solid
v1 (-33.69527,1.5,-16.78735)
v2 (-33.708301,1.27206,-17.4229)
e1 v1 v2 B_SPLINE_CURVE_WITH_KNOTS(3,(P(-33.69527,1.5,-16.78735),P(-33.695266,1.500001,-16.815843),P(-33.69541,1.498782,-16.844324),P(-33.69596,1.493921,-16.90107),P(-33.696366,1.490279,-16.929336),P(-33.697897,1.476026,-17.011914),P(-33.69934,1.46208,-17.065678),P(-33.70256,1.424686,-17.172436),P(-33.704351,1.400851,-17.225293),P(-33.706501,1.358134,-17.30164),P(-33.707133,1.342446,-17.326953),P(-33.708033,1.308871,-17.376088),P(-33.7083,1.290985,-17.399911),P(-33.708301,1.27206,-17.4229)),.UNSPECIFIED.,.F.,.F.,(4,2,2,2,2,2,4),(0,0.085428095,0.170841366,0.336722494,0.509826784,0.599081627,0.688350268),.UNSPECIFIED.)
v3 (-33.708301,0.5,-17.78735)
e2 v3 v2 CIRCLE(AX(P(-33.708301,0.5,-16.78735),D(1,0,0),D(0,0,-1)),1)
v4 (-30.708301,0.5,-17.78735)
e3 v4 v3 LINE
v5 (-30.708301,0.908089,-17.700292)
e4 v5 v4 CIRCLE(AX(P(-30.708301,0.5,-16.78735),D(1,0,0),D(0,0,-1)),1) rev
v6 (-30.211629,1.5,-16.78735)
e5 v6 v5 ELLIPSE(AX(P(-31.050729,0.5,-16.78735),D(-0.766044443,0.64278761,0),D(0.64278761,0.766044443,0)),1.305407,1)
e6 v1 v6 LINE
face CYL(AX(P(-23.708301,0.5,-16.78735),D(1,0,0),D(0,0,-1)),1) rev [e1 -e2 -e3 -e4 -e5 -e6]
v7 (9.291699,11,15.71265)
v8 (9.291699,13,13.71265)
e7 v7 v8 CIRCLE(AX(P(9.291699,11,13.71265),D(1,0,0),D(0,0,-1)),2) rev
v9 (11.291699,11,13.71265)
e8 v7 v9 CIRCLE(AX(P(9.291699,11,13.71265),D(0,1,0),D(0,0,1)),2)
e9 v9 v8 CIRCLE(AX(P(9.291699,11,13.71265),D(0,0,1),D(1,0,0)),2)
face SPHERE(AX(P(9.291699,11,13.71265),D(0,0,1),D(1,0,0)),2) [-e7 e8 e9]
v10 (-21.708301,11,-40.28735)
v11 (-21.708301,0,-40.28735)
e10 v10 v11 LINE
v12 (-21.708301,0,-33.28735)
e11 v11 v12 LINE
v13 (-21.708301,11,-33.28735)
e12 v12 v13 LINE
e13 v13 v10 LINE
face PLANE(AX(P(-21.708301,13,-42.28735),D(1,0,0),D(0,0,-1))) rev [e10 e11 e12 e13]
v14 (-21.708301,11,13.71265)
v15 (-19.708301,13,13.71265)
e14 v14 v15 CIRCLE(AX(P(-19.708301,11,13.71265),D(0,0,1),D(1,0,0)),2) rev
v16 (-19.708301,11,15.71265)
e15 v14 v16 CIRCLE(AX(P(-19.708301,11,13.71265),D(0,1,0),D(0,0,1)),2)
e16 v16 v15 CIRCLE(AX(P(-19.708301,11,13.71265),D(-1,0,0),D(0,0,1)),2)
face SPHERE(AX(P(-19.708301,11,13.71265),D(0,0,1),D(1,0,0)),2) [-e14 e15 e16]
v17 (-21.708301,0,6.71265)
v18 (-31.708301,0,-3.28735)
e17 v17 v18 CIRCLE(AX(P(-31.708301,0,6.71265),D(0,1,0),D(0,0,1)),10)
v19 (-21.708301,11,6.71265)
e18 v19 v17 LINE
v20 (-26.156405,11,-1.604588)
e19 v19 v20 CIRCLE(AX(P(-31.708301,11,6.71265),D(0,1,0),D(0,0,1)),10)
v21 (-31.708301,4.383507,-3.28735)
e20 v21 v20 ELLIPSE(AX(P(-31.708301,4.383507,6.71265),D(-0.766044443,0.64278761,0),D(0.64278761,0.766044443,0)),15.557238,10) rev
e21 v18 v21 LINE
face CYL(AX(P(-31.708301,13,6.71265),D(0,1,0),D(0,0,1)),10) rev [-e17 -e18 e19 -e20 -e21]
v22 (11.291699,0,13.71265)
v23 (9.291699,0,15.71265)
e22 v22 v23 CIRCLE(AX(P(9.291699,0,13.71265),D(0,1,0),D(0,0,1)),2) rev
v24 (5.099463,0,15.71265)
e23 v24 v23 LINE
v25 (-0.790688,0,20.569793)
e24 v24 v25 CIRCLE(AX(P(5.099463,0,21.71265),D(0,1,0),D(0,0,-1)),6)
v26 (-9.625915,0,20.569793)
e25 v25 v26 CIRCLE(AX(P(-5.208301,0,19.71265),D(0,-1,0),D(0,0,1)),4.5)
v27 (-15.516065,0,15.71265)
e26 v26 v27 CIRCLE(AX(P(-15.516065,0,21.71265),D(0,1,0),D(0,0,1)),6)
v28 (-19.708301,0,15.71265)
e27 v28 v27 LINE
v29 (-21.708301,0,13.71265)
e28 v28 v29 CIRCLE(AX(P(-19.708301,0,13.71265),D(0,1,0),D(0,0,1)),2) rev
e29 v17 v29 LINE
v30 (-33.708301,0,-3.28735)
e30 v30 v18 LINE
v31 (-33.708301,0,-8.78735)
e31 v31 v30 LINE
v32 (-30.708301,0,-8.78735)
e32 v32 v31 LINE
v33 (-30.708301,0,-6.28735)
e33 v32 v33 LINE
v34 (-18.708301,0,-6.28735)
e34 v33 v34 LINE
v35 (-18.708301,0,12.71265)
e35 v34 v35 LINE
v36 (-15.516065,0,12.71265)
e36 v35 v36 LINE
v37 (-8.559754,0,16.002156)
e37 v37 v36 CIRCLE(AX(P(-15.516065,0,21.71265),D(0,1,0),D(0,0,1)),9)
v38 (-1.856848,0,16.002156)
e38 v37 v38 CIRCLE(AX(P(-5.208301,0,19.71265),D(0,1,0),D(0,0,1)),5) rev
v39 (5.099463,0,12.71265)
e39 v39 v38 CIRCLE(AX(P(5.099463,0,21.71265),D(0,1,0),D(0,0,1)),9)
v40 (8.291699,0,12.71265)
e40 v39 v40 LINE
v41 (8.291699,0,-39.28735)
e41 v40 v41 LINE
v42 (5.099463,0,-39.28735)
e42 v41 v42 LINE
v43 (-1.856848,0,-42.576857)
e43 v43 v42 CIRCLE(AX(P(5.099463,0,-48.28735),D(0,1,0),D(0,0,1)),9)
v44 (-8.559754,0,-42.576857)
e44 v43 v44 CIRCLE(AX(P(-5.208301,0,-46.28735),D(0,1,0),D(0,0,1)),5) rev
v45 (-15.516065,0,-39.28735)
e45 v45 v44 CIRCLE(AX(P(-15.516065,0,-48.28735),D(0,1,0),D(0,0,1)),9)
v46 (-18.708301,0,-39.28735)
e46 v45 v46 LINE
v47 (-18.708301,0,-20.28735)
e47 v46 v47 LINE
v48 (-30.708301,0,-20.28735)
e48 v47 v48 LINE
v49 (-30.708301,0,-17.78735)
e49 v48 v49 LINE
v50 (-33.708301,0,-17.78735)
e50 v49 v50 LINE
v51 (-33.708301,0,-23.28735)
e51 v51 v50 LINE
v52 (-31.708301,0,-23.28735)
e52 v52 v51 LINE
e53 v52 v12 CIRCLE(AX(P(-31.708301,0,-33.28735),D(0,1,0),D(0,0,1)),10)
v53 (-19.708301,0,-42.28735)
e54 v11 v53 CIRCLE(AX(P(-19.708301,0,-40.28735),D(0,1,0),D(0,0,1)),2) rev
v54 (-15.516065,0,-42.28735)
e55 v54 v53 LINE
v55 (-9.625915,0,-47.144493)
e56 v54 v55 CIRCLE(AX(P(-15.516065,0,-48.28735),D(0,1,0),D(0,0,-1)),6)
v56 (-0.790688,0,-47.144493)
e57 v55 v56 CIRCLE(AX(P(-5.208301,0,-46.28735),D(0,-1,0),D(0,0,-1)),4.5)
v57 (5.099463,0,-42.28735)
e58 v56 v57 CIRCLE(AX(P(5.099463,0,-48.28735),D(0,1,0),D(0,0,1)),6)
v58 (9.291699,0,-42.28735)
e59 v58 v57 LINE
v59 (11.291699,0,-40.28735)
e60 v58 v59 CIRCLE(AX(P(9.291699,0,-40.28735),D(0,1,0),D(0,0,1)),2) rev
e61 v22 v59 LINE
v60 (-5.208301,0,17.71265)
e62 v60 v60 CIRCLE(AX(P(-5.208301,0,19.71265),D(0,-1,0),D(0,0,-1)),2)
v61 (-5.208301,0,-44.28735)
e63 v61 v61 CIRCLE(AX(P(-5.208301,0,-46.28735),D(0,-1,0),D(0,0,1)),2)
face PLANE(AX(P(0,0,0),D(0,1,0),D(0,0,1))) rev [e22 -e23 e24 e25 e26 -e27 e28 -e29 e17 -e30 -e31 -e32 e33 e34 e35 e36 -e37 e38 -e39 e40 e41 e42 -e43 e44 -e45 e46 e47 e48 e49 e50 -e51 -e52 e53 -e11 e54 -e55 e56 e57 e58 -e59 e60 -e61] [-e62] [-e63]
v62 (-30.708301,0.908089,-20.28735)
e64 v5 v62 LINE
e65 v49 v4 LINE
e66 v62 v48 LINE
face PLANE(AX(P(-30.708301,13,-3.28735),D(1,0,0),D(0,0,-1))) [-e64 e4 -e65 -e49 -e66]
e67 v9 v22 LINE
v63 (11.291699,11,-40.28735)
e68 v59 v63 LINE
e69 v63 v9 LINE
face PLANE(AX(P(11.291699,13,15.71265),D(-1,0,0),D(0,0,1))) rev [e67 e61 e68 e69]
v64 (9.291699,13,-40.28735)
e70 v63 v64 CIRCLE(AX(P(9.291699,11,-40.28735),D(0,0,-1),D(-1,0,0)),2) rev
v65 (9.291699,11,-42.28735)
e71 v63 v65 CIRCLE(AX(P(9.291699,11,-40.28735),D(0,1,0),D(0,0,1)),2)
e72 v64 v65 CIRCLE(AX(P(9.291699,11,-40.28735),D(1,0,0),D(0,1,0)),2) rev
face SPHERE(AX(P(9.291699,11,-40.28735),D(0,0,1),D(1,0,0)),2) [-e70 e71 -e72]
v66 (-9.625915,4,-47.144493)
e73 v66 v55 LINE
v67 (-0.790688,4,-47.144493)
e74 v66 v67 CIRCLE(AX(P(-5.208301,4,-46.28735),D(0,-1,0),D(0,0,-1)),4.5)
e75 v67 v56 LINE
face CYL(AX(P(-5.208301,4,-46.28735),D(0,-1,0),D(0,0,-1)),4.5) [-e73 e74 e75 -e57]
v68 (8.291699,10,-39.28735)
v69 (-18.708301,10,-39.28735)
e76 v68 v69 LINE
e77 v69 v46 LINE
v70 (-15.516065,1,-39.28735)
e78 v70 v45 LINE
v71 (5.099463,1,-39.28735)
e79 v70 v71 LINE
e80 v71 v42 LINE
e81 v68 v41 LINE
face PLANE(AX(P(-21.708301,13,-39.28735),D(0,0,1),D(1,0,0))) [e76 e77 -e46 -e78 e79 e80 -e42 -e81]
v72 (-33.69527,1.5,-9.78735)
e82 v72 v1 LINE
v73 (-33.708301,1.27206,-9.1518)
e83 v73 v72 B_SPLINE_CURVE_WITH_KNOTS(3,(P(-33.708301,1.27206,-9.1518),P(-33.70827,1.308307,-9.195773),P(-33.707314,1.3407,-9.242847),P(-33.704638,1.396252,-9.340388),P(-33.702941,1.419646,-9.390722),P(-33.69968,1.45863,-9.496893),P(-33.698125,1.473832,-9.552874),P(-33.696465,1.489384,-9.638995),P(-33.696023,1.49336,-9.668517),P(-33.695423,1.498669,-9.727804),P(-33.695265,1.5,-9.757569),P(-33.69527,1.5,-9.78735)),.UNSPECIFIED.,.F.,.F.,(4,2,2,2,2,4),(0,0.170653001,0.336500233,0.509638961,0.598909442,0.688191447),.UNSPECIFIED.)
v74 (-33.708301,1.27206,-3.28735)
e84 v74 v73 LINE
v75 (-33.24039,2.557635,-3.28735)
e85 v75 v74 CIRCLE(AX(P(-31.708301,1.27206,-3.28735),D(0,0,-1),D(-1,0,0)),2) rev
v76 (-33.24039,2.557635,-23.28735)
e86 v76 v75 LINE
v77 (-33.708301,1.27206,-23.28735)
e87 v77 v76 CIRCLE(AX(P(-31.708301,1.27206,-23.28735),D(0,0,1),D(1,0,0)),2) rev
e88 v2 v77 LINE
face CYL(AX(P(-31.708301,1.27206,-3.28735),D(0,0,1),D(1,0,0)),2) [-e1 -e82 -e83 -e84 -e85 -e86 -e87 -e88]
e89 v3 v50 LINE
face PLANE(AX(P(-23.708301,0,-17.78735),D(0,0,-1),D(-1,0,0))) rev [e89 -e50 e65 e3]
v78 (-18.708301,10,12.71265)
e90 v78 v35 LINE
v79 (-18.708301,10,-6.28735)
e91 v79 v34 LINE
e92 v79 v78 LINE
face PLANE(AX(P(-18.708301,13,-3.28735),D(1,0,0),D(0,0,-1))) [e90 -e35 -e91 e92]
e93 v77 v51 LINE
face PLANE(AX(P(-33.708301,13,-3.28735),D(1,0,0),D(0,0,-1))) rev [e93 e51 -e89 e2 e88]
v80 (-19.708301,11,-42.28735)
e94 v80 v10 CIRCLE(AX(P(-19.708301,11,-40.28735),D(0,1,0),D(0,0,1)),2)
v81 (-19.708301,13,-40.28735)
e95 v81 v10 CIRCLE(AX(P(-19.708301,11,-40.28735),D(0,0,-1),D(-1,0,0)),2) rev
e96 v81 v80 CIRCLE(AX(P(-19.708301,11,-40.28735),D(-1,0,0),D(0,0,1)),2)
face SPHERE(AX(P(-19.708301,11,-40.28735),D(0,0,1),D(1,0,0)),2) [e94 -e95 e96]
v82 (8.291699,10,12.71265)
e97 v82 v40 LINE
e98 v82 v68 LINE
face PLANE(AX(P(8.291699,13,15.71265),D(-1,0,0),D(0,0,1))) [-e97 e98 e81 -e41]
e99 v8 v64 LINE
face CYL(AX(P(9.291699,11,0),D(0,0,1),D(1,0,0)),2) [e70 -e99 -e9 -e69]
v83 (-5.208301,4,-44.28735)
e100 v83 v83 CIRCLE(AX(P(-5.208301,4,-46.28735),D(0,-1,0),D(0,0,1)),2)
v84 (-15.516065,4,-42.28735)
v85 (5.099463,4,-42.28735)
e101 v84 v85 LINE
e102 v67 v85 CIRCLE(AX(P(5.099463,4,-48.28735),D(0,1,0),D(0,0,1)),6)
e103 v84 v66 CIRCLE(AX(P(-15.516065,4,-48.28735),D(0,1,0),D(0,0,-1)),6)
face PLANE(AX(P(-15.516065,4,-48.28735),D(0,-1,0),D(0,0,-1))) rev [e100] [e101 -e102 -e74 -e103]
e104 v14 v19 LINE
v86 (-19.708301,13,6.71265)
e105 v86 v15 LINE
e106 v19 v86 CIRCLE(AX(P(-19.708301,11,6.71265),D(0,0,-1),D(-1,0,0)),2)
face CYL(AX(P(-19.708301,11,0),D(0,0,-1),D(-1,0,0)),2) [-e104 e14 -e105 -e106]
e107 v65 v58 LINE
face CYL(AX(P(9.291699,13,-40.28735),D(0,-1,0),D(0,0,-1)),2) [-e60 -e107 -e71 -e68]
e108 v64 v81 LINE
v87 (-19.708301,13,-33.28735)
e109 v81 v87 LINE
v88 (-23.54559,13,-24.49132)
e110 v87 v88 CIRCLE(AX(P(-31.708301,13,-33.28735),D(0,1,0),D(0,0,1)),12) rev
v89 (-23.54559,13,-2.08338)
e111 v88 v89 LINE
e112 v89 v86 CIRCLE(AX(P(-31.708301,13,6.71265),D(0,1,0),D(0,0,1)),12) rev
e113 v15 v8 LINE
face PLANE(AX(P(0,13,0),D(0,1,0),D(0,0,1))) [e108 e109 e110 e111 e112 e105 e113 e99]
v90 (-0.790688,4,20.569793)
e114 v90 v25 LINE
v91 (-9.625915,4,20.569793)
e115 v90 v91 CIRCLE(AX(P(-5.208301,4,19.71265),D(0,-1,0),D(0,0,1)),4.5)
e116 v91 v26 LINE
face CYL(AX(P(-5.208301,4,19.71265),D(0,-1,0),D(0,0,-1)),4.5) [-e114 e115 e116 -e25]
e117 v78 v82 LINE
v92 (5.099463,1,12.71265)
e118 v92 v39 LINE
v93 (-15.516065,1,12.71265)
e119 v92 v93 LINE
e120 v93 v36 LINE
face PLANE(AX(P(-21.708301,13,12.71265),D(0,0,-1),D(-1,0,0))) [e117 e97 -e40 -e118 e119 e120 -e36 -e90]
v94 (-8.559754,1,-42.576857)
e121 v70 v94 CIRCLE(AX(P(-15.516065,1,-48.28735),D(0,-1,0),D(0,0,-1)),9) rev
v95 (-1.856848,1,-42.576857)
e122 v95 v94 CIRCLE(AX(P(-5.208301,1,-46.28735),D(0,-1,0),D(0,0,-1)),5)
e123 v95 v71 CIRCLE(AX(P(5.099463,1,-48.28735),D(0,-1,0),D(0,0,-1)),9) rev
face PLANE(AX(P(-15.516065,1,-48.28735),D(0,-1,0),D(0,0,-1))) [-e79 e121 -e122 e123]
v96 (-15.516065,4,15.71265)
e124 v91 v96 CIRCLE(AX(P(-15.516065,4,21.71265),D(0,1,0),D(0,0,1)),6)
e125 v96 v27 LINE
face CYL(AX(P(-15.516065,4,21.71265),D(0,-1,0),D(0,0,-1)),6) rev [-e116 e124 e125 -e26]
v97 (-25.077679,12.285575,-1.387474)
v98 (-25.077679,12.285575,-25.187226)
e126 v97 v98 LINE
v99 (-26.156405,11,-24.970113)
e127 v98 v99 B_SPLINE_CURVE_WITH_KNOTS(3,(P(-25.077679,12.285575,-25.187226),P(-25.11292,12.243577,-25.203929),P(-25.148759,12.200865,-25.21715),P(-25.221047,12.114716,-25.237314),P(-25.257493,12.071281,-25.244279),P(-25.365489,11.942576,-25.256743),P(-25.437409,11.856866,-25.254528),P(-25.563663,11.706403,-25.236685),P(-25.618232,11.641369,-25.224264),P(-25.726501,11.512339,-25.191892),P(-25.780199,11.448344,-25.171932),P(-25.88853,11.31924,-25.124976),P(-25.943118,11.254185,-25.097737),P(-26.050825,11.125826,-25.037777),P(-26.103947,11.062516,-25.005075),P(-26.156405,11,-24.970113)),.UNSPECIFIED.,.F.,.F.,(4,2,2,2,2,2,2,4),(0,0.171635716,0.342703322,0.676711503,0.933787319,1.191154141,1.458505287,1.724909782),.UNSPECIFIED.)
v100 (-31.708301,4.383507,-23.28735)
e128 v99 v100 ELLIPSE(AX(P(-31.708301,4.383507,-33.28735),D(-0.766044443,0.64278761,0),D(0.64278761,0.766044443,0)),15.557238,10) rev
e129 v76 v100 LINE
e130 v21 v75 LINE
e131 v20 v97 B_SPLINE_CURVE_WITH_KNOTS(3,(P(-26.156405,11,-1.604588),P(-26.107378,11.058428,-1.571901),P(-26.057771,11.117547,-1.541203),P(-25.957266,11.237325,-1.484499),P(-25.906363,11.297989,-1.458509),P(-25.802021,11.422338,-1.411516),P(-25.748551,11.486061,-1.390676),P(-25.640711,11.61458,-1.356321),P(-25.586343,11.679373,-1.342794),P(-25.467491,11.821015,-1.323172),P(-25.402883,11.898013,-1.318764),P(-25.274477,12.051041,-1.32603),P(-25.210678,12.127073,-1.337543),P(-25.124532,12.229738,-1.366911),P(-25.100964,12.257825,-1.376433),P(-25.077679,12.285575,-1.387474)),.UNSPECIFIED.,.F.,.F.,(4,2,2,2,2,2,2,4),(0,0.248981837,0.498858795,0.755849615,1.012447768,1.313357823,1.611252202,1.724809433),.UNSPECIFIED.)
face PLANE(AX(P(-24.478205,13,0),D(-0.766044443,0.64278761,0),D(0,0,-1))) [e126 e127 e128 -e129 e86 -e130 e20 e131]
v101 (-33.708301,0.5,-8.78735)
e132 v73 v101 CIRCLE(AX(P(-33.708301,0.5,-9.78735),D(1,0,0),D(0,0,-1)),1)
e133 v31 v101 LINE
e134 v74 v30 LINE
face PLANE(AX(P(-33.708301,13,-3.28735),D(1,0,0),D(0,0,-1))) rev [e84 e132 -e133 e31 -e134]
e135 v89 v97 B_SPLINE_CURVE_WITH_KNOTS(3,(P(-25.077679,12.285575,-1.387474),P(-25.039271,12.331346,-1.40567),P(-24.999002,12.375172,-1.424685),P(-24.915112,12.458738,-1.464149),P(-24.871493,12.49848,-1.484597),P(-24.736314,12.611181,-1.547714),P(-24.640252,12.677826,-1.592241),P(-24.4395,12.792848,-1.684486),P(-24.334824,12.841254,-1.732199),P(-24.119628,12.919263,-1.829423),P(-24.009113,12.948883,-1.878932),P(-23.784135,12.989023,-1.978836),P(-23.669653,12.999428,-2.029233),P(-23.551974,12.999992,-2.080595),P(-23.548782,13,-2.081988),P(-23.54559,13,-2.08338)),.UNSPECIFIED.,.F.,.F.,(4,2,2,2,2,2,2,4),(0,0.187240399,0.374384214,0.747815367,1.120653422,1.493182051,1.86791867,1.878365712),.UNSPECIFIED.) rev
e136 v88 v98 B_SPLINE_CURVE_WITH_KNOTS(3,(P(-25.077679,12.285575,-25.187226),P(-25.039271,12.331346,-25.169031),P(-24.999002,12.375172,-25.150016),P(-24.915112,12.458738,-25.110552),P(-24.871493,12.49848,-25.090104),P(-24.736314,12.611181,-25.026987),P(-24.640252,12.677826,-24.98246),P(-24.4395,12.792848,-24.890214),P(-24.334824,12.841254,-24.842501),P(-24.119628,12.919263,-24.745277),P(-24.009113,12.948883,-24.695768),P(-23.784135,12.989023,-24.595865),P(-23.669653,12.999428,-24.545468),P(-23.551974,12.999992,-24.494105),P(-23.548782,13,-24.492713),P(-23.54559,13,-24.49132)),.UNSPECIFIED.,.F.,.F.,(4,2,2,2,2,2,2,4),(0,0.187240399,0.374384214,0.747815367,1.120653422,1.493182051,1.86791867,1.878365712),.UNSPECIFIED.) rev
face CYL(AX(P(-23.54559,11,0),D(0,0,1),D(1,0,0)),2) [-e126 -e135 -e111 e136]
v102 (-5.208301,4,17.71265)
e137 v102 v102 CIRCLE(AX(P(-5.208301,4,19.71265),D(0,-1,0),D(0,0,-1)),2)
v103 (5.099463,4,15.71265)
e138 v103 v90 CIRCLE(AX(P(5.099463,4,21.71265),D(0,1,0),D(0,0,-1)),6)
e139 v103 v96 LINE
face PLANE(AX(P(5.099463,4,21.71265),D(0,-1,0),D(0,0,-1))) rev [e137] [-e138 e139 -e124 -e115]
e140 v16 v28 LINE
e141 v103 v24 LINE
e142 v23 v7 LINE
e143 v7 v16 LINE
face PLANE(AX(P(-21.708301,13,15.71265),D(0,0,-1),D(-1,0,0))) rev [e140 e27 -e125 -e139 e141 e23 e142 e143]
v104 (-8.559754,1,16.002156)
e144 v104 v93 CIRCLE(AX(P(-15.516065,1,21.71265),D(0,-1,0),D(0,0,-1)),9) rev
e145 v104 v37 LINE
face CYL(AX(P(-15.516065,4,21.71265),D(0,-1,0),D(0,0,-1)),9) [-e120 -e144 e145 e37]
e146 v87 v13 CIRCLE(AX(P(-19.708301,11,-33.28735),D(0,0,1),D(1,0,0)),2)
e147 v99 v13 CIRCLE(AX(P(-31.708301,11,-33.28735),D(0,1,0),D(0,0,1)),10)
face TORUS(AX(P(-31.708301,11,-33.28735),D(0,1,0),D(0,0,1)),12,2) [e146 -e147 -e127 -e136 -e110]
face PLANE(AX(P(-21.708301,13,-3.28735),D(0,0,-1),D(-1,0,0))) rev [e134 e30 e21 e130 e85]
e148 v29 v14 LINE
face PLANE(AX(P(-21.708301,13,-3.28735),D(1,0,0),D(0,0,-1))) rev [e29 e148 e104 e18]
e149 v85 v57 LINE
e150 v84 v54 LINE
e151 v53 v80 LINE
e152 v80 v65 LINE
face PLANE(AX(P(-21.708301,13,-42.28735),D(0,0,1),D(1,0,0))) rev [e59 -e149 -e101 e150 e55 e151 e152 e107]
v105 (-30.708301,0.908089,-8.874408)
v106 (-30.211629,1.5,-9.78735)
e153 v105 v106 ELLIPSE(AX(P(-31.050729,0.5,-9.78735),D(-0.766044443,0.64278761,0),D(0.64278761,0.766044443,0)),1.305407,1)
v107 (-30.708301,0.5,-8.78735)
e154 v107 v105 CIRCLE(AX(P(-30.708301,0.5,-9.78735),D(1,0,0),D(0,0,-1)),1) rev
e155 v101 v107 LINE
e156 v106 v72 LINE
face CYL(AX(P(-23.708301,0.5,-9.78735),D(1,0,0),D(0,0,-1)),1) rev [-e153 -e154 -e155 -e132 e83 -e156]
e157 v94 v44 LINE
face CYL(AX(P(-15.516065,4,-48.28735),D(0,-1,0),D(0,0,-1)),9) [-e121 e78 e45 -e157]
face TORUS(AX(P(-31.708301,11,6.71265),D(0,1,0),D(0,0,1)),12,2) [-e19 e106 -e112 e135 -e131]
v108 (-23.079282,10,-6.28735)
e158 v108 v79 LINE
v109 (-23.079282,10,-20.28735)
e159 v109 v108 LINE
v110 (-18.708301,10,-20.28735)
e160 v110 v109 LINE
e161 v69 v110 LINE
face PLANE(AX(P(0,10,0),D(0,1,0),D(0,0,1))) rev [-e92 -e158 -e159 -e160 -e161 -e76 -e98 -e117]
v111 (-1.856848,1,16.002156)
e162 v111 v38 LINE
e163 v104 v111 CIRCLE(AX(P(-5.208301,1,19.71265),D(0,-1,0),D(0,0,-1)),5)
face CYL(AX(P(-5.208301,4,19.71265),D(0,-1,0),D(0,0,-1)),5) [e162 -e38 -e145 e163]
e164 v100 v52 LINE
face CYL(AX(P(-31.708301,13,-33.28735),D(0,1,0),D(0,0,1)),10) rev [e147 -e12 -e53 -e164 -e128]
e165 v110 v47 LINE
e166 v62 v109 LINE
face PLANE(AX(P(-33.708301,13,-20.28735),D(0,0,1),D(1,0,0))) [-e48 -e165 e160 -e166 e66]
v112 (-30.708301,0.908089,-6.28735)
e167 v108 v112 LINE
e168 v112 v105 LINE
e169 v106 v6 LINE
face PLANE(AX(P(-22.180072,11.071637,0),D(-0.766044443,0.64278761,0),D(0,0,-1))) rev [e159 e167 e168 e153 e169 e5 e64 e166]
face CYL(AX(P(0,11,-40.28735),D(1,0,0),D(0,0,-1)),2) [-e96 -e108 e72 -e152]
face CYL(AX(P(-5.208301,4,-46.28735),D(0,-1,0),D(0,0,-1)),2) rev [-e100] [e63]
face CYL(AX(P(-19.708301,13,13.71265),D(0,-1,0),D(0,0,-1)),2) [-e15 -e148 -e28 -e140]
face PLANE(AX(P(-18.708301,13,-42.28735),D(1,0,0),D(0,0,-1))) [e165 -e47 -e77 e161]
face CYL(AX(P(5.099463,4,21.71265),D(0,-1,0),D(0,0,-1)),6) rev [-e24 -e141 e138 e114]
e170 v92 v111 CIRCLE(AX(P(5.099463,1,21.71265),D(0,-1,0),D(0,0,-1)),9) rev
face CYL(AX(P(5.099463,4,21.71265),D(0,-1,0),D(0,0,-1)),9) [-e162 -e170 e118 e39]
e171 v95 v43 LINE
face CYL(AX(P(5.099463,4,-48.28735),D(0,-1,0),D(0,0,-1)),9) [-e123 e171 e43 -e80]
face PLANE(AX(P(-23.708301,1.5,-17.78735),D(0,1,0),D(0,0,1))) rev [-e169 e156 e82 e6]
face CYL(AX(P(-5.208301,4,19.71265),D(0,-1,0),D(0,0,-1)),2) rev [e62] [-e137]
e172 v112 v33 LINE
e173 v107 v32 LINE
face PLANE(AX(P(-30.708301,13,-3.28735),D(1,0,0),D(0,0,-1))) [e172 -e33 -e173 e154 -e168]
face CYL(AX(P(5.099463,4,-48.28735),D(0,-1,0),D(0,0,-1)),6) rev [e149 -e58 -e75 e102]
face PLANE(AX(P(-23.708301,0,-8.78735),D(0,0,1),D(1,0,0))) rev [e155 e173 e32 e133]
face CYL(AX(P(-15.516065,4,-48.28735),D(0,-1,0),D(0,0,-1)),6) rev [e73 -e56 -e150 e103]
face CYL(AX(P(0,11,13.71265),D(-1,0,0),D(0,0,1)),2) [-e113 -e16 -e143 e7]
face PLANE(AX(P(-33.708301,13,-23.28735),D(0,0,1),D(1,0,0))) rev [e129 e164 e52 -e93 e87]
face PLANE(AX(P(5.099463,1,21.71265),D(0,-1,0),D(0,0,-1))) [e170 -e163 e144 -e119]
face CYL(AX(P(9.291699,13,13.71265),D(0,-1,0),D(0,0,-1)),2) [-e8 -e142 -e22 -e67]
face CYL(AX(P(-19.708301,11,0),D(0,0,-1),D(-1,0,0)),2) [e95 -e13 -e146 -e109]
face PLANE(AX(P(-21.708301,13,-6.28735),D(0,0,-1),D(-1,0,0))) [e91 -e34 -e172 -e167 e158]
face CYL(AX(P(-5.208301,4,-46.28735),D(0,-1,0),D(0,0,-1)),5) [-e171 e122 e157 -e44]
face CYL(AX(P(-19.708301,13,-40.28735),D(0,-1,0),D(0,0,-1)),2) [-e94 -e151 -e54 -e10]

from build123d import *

# Parameters (mm, degrees)
BOSS_EXTRU_1_DEPTH      = 13
ESQUISSE2_R             = 2
BOSS_EXTRU_2_DEPTH      = 4
CHANFREIN2_SIZE         = 11
CHANFREIN2_SIZE2        = 9.230095943
COQUE1_DEPTH            = 0.908089297
COQUE1_2_DEPTH          = 1
COQUE1_START            = -39.287350261
COQUE1_3_OUTLINE_W      = 27
COQUE1_3_OUTLINE_H      = 9.091910703
COQUE1_3_DEPTH          = 52
COQUE1_START_2          = -20.287350261
COQUE1_4_DEPTH          = 14
CONG_4_R                = 10
ESQUISSE3_W             = 9
ESQUISSE3_H             = 1.5
ENL_V_MAT_EXTRU_1_DEPTH = 10
CONG_2_R                = 1
CONG_3_R                = 2


with BuildPart() as part:
    # Esquisse1 → Boss.-Extru.1 (new body)
    with BuildSketch(Plane(origin=(0, 0, 0), x_dir=(1, 0, 0), z_dir=(0, 1, 0))):
        Polygon((-21.708301388, 3.287350261), (-33.708301388, 3.287350261), (-33.708301388, 23.287350261), (-21.708301388, 23.287350261), (-21.708301388, 42.287350261), (11.291698612, 42.287350261), (11.291698612, -15.712649739), (-21.708301388, -15.712649739), align=None)
    extrude(amount=BOSS_EXTRU_1_DEPTH)

    # Esquisse2 → Boss.-Extru.2 (add)
    # profile 1 of 2: a face of its own
    with BuildSketch(Plane.XZ):
        with BuildLine():
            Line((-17.708301388, 12.712649739), (7.291698612, 12.712649739))
            Line((7.291698612, 12.712649739), (7.291698612, 15.712649739))
            Line((7.291698612, 15.712649739), (5.099462676, 15.712649739))
            ThreePointArc((5.099462676, 15.712649739), (1.282208614, 17.08354924), (-0.790688218, 20.569792596))
            ThreePointArc((-0.790688218, 20.569792596), (-5.208301388, 24.212649739), (-9.625914558, 20.569792596))
            ThreePointArc((-9.625914558, 20.569792596), (-11.698811391, 17.08354924), (-15.516065452, 15.712649739))
            Line((-15.516065452, 15.712649739), (-17.708301388, 15.712649739))
            Line((-17.708301388, 15.712649739), (-17.708301388, 12.712649739))
        make_face()
        with Locations(Location((-5.208301388, 19.712649739, 0), (0, 0, 270))):
            Circle(ESQUISSE2_R, mode=Mode.SUBTRACT)
    # profile 2 of 2: a face of its own
    with BuildSketch(Plane.XZ):
        with BuildLine():
            Line((-17.708301388, -42.287350261), (-17.708301388, -39.287350261))
            Line((-17.708301388, -39.287350261), (7.291698612, -39.287350261))
            Line((7.291698612, -39.287350261), (7.291698612, -42.287350261))
            Line((7.291698612, -42.287350261), (5.099462676, -42.287350261))
            ThreePointArc((5.099462676, -42.287350261), (1.282208614, -43.658249762), (-0.790688218, -47.144493118))
            ThreePointArc((-0.790688218, -47.144493118), (-5.208301388, -50.787350261), (-9.625914558, -47.144493118))
            ThreePointArc((-9.625914558, -47.144493118), (-11.698811391, -43.658249762), (-15.516065452, -42.287350261))
            Line((-15.516065452, -42.287350261), (-17.708301388, -42.287350261))
        make_face()
        with Locations(Location((-5.208301388, -46.287350261, 0), (0, 0, 90))):
            Circle(ESQUISSE2_R, mode=Mode.SUBTRACT)
    extrude(amount=-BOSS_EXTRU_2_DEPTH)

    # Chanfrein2
    chanfrein2_edges = [part.edges().sort_by_distance(p)[0] for p in [
        (-33.708301388, 13, -13.287350261),
    ]]
    chanfrein2_side = [part.faces().sort_by_distance(p)[0] for p in [
        (-33.708301388, 6.5, -13.287350261),
    ]]
    chamfer(chanfrein2_edges, length=CHANFREIN2_SIZE, length2=CHANFREIN2_SIZE2, reference=chanfrein2_side[0])

    # Coque1: read off the stored shape, not the designer's step
    # Coque1 outline → Coque1 (cut)
    with BuildSketch(Plane(origin=(0, 0, 0), x_dir=(1, 0, 0), z_dir=(0, 1, 0))):
        with BuildLine():
            Line((-18.708301388, 6.287350261), (-18.708301388, -12.712649739))
            Line((-18.708301388, -12.712649739), (-15.516065452, -12.712649739))
            ThreePointArc((-15.516065452, -12.712649739), (-11.668627484, -13.57648227), (-8.559754422, -16.002156165))
            ThreePointArc((-8.559754422, -16.002156165), (-5.208301388, -14.712649739), (-1.856848354, -16.002156165))
            ThreePointArc((-1.856848354, -16.002156165), (1.252024708, -13.57648227), (5.099462676, -12.712649739))
            Line((5.099462676, -12.712649739), (8.291698612, -12.712649739))
            Line((8.291698612, -12.712649739), (8.291698612, 39.287350261))
            Line((8.291698612, 39.287350261), (5.099462676, 39.287350261))
            ThreePointArc((5.099462676, 39.287350261), (1.252024708, 40.151182792), (-1.856848354, 42.576856687))
            ThreePointArc((-1.856848354, 42.576856687), (-5.208301388, 41.287350261), (-8.559754422, 42.576856687))
            ThreePointArc((-8.559754422, 42.576856687), (-11.668627484, 40.151182792), (-15.516065452, 39.287350261))
            Line((-15.516065452, 39.287350261), (-18.708301388, 39.287350261))
            Line((-18.708301388, 39.287350261), (-18.708301388, 20.287350261))
            Line((-18.708301388, 20.287350261), (-30.708301388, 20.287350261))
            Line((-30.708301388, 20.287350261), (-30.708301388, 6.287350261))
            Line((-30.708301388, 6.287350261), (-18.708301388, 6.287350261))
        make_face()
    extrude(amount=COQUE1_DEPTH, mode=Mode.SUBTRACT)

    # Coque1 2 outline → Coque1 2 (cut)
    with BuildSketch(Plane(origin=(0, 0, 0), x_dir=(1, 0, 0), z_dir=(0, 1, 0))):
        with BuildLine():
            Line((5.099462676, -12.712649739), (-15.516065452, -12.712649739))
            ThreePointArc((-15.516065452, -12.712649739), (-11.668627484, -13.57648227), (-8.559754422, -16.002156165))
            ThreePointArc((-8.559754422, -16.002156165), (-5.208301388, -14.712649739), (-1.856848354, -16.002156165))
            ThreePointArc((-1.856848354, -16.002156165), (1.252024708, -13.57648227), (5.099462676, -12.712649739))
        make_face()
        with BuildLine():
            Line((-15.516065452, 39.287350261), (5.099462676, 39.287350261))
            ThreePointArc((5.099462676, 39.287350261), (1.252024708, 40.151182792), (-1.856848354, 42.576856687))
            ThreePointArc((-1.856848354, 42.576856687), (-5.208301388, 41.287350261), (-8.559754422, 42.576856687))
            ThreePointArc((-8.559754422, 42.576856687), (-11.668627484, 40.151182792), (-15.516065452, 39.287350261))
        make_face()
    extrude(amount=COQUE1_2_DEPTH, mode=Mode.SUBTRACT)

    # Coque1 3 outline → Coque1 3 (cut)
    with BuildSketch(Plane.XY.offset(COQUE1_START)):
        with Locations((-5.208301388, 5.454044649)):
            Rectangle(COQUE1_3_OUTLINE_W, COQUE1_3_OUTLINE_H)
    extrude(amount=COQUE1_3_DEPTH, mode=Mode.SUBTRACT)

    # Coque1 4 outline → Coque1 4 (cut)
    with BuildSketch(Plane.XY.offset(COQUE1_START_2)):
        Polygon((-30.708301388, 0.908089297), (-18.708301388, 0.908089297), (-18.708301388, 10), (-23.079282471, 10), align=None)
    extrude(amount=COQUE1_4_DEPTH, mode=Mode.SUBTRACT)

    # Congé4
    # the kernel refuses this fillet: 10 mm, written as the material it adds along each edge
    with BuildSketch(Plane(origin=(-21.708301388, 0, -3.287350261), x_dir=(-1, 0, 0), z_dir=(0, 1, 0))) as cong_4_piece_1_section:
        with BuildLine():
            CenterArc((CONG_4_R, CONG_4_R), CONG_4_R, 180, 90)
            Line((0, CONG_4_R), (0, 0))
            Line((0, 0), (CONG_4_R, 0))
        make_face()
    cong_4_piece_1 = extrude(amount=13, mode=Mode.PRIVATE)
    cong_4_piece_1 = split(cong_4_piece_1, bisect_by=Plane(origin=(-29.734998207, 6.73519834, -3.287350261), z_dir=(0.7660444431189771, -0.6427876096865405, 0)), keep=Keep.TOP, mode=Mode.PRIVATE)
    add(cong_4_piece_1)
    with BuildSketch(Plane(origin=(-21.708301388, 0, -23.287350261), x_dir=(0, 0, -1), z_dir=(0, 1, 0))) as cong_4_piece_2_section:
        with BuildLine():
            CenterArc((CONG_4_R, CONG_4_R), CONG_4_R, 180, 90)
            Line((0, CONG_4_R), (0, 0))
            Line((0, 0), (CONG_4_R, 0))
        make_face()
    cong_4_piece_2 = extrude(amount=13, mode=Mode.PRIVATE)
    cong_4_piece_2 = split(cong_4_piece_2, bisect_by=Plane(origin=(-29.734998207, 6.73519834, -23.287350261), z_dir=(0.7660444431189771, -0.6427876096865405, 0)), keep=Keep.TOP, mode=Mode.PRIVATE)
    add(cong_4_piece_2)

    # Esquisse3 → Enlèv. mat.-Extru.1 (cut)
    with BuildSketch(Plane.ZY.offset(33.708301388)):
        with Locations((-13.287350261, 0.75)):
            Rectangle(ESQUISSE3_W, ESQUISSE3_H)
    extrude(amount=-ENL_V_MAT_EXTRU_1_DEPTH, mode=Mode.SUBTRACT)

    # Congé2
    cong_2_edges = [part.edges().sort_by_distance(p)[0] for p in [
        (-31.959965362, 1.5, -8.787350261),
        (-31.959965362, 1.5, -17.787350261),
    ]]
    fillet(cong_2_edges, radius=CONG_2_R)

    # Congé3
    # the kernel refuses this fillet: 2 mm, written as the material it takes off along each edge
    with BuildSketch(Plane(origin=(9.291698612, 11, -40.287350261), x_dir=(0, 0, -1), z_dir=(1, 0, 0))) as cong_3_piece_1_section:
        Polygon((0, 0), (CONG_3_R, 0), (CONG_3_R, CONG_3_R), (0, CONG_3_R), align=None)
    cong_3_piece_1 = extrude(amount=CONG_3_R, mode=Mode.PRIVATE)
    cong_3_piece_1 = cong_3_piece_1 - Plane(origin=(9.291698612, 11, -40.287350261), x_dir=(0, -0.7071067811865475, 0.7071067811865475), z_dir=(1, 0, 0)) * Sphere(CONG_3_R, mode=Mode.PRIVATE)
    add(cong_3_piece_1, mode=Mode.SUBTRACT)
    with BuildSketch(Plane(origin=(9.291698612, 11, 13.712649739), x_dir=(0, 1, 0), z_dir=(1, 0, 0))) as cong_3_piece_2_section:
        Polygon((0, 0), (CONG_3_R, 0), (CONG_3_R, CONG_3_R), (0, CONG_3_R), align=None)
    cong_3_piece_2 = extrude(amount=CONG_3_R, mode=Mode.PRIVATE)
    cong_3_piece_2 = cong_3_piece_2 - Plane(origin=(9.291698612, 11, 13.712649739), x_dir=(0, -0.7071067811865475, -0.7071067811865475), z_dir=(1, 0, 0)) * Sphere(CONG_3_R, mode=Mode.PRIVATE)
    add(cong_3_piece_2, mode=Mode.SUBTRACT)
    with BuildSketch(Plane(origin=(-19.708301388, 11, 13.712649739), x_dir=(-1, 0, 0), z_dir=(0, 1, 0))) as cong_3_piece_3_section:
        Polygon((0, 0), (CONG_3_R, 0), (CONG_3_R, CONG_3_R), (0, CONG_3_R), align=None)
    cong_3_piece_3 = extrude(amount=CONG_3_R, mode=Mode.PRIVATE)
    cong_3_piece_3 = cong_3_piece_3 - Plane(origin=(-19.708301388, 11, 13.712649739), x_dir=(0.7071067811865475, 0, -0.7071067811865475), z_dir=(0, 1, 0)) * Sphere(CONG_3_R, mode=Mode.PRIVATE)
    add(cong_3_piece_3, mode=Mode.SUBTRACT)
    with BuildSketch(Plane(origin=(-19.708301388, 11, -40.287350261), x_dir=(-1, 0, 0), z_dir=(0, 0, -1))) as cong_3_piece_4_section:
        Polygon((0, 0), (CONG_3_R, 0), (CONG_3_R, CONG_3_R), (0, CONG_3_R), align=None)
    cong_3_piece_4 = extrude(amount=CONG_3_R, mode=Mode.PRIVATE)
    cong_3_piece_4 = cong_3_piece_4 - Plane(origin=(-19.708301388, 11, -40.287350261), x_dir=(0.7071067811865475, -0.7071067811865475, 0), z_dir=(0, 0, -1)) * Sphere(CONG_3_R, mode=Mode.PRIVATE)
    add(cong_3_piece_4, mode=Mode.SUBTRACT)
    with BuildSketch(Plane(origin=(11.291698612, -5, -42.287350261), x_dir=(0, 0, 1), z_dir=(0, 1, 0)), Plane(origin=(11.291698612, -5, 15.712649739), x_dir=(-1, 0, 0), z_dir=(0, 1, 0)), Plane(origin=(-21.708301388, -5, 15.712649739), x_dir=(0, 0, -1), z_dir=(0, 1, 0)), Plane(origin=(-21.708301388, -5, -42.287350261), x_dir=(1, 0, 0), z_dir=(0, 1, 0))) as cong_3_piece_5:
        with BuildLine():
            CenterArc((CONG_3_R, -CONG_3_R), CONG_3_R, 90, 90)
            Line((0, -CONG_3_R), (0, 0))
            Line((0, 0), (CONG_3_R, 0))
        make_face()
    extrude(amount=16, mode=Mode.SUBTRACT)
    with BuildSketch(Plane(origin=(11.291698612, 13, -40.287350261), x_dir=(0, -1, 0), z_dir=(0, 0, 1))) as cong_3_piece_6:
        with BuildLine():
            CenterArc((CONG_3_R, -CONG_3_R), CONG_3_R, 90, 90)
            Line((0, -CONG_3_R), (0, 0))
            Line((0, 0), (CONG_3_R, 0))
        make_face()
    extrude(amount=54, mode=Mode.SUBTRACT)
    with BuildSketch(Plane(origin=(9.291698612, 13, 15.712649739), x_dir=(0, -1, 0), z_dir=(-1, 0, 0)), Plane(origin=(-19.708301388, 13, -42.287350261), x_dir=(0, -1, 0), z_dir=(1, 0, 0))) as cong_3_piece_7:
        with BuildLine():
            CenterArc((CONG_3_R, -CONG_3_R), CONG_3_R, 90, 90)
            Line((0, -CONG_3_R), (0, 0))
            Line((0, 0), (CONG_3_R, 0))
        make_face()
    extrude(amount=29, mode=Mode.SUBTRACT)
    with BuildSketch(Plane(origin=(-21.708301388, 13, 13.712649739), x_dir=(0, -1, 0), z_dir=(0, 0, -1)), Plane(origin=(-21.708301388, 13, -33.287350261), x_dir=(0, -1, 0), z_dir=(0, 0, -1))) as cong_3_piece_8:
        with BuildLine():
            CenterArc((CONG_3_R, -CONG_3_R), CONG_3_R, 90, 90)
            Line((0, -CONG_3_R), (0, 0))
            Line((0, 0), (CONG_3_R, 0))
        make_face()
    extrude(amount=7, mode=Mode.SUBTRACT)
    with BuildSketch(Plane(origin=(-33.708301388, 2, -1.46749909), x_dir=(0, -1, 0), z_dir=(0, 0, -1))) as cong_3_piece_9:
        with BuildLine():
            CenterArc((CONG_3_R * 0.363970234266, -CONG_3_R), CONG_3_R, 90, 40)
            Line((-CONG_3_R * 0.27881737542, -CONG_3_R * 0.233955556881), (0, 0))
            Line((0, 0), (CONG_3_R * 0.363970234266, 0))
        make_face()
    extrude(amount=23.639702343, mode=Mode.SUBTRACT)
    with BuildSketch(Plane(origin=(-24.478205445, 13, -28.710508665), x_dir=(-0.642787609686802, -0.7660444431187577, 0), z_dir=(0, 0, 1))) as cong_3_piece_10:
        with BuildLine():
            CenterArc((CONG_3_R * 0.466307658155, CONG_3_R), CONG_3_R, 220, 50)
            Line((-CONG_3_R * 0.299736784964, CONG_3_R * 0.357212390313), (0, 0))
            Line((0, 0), (CONG_3_R * 0.466307658155, 0))
        make_face()
    extrude(amount=30.846316809, mode=Mode.SUBTRACT)
    with BuildSketch(Plane(origin=(-31.708301388, 13, 6.712649739), x_dir=(1, 0, 0), z_dir=(0, 0, 1))) as cong_3_piece_11:
        with BuildLine():
            CenterArc((10 + CONG_3_R, -CONG_3_R), CONG_3_R, 90, 90)
            Line((10 + CONG_3_R, 0), (10, 0))
            Line((10, 0), (10, -CONG_3_R))
        make_face()
    revolve(axis=Axis((-31.708301388, 13, 6.712649739), (0, 1, 0)), revolution_arc=72.347081519, mode=Mode.SUBTRACT)
    with BuildSketch(Plane(origin=(-31.708301388, 13, -33.287350261), x_dir=(0.3032501302035069, 0, 0.9529109919250359), z_dir=(-0.9529109919250359, 0, 0.3032501302035069))) as cong_3_piece_12:
        with BuildLine():
            CenterArc((10 + CONG_3_R, -CONG_3_R), CONG_3_R, 90, 90)
            Line((10 + CONG_3_R, 0), (10, 0))
            Line((10, 0), (10, -CONG_3_R))
        make_face()
    revolve(axis=Axis((-31.708301388, 13, -33.287350261), (0, 1, 0)), revolution_arc=72.347081519, mode=Mode.SUBTRACT)


solid = part.part
